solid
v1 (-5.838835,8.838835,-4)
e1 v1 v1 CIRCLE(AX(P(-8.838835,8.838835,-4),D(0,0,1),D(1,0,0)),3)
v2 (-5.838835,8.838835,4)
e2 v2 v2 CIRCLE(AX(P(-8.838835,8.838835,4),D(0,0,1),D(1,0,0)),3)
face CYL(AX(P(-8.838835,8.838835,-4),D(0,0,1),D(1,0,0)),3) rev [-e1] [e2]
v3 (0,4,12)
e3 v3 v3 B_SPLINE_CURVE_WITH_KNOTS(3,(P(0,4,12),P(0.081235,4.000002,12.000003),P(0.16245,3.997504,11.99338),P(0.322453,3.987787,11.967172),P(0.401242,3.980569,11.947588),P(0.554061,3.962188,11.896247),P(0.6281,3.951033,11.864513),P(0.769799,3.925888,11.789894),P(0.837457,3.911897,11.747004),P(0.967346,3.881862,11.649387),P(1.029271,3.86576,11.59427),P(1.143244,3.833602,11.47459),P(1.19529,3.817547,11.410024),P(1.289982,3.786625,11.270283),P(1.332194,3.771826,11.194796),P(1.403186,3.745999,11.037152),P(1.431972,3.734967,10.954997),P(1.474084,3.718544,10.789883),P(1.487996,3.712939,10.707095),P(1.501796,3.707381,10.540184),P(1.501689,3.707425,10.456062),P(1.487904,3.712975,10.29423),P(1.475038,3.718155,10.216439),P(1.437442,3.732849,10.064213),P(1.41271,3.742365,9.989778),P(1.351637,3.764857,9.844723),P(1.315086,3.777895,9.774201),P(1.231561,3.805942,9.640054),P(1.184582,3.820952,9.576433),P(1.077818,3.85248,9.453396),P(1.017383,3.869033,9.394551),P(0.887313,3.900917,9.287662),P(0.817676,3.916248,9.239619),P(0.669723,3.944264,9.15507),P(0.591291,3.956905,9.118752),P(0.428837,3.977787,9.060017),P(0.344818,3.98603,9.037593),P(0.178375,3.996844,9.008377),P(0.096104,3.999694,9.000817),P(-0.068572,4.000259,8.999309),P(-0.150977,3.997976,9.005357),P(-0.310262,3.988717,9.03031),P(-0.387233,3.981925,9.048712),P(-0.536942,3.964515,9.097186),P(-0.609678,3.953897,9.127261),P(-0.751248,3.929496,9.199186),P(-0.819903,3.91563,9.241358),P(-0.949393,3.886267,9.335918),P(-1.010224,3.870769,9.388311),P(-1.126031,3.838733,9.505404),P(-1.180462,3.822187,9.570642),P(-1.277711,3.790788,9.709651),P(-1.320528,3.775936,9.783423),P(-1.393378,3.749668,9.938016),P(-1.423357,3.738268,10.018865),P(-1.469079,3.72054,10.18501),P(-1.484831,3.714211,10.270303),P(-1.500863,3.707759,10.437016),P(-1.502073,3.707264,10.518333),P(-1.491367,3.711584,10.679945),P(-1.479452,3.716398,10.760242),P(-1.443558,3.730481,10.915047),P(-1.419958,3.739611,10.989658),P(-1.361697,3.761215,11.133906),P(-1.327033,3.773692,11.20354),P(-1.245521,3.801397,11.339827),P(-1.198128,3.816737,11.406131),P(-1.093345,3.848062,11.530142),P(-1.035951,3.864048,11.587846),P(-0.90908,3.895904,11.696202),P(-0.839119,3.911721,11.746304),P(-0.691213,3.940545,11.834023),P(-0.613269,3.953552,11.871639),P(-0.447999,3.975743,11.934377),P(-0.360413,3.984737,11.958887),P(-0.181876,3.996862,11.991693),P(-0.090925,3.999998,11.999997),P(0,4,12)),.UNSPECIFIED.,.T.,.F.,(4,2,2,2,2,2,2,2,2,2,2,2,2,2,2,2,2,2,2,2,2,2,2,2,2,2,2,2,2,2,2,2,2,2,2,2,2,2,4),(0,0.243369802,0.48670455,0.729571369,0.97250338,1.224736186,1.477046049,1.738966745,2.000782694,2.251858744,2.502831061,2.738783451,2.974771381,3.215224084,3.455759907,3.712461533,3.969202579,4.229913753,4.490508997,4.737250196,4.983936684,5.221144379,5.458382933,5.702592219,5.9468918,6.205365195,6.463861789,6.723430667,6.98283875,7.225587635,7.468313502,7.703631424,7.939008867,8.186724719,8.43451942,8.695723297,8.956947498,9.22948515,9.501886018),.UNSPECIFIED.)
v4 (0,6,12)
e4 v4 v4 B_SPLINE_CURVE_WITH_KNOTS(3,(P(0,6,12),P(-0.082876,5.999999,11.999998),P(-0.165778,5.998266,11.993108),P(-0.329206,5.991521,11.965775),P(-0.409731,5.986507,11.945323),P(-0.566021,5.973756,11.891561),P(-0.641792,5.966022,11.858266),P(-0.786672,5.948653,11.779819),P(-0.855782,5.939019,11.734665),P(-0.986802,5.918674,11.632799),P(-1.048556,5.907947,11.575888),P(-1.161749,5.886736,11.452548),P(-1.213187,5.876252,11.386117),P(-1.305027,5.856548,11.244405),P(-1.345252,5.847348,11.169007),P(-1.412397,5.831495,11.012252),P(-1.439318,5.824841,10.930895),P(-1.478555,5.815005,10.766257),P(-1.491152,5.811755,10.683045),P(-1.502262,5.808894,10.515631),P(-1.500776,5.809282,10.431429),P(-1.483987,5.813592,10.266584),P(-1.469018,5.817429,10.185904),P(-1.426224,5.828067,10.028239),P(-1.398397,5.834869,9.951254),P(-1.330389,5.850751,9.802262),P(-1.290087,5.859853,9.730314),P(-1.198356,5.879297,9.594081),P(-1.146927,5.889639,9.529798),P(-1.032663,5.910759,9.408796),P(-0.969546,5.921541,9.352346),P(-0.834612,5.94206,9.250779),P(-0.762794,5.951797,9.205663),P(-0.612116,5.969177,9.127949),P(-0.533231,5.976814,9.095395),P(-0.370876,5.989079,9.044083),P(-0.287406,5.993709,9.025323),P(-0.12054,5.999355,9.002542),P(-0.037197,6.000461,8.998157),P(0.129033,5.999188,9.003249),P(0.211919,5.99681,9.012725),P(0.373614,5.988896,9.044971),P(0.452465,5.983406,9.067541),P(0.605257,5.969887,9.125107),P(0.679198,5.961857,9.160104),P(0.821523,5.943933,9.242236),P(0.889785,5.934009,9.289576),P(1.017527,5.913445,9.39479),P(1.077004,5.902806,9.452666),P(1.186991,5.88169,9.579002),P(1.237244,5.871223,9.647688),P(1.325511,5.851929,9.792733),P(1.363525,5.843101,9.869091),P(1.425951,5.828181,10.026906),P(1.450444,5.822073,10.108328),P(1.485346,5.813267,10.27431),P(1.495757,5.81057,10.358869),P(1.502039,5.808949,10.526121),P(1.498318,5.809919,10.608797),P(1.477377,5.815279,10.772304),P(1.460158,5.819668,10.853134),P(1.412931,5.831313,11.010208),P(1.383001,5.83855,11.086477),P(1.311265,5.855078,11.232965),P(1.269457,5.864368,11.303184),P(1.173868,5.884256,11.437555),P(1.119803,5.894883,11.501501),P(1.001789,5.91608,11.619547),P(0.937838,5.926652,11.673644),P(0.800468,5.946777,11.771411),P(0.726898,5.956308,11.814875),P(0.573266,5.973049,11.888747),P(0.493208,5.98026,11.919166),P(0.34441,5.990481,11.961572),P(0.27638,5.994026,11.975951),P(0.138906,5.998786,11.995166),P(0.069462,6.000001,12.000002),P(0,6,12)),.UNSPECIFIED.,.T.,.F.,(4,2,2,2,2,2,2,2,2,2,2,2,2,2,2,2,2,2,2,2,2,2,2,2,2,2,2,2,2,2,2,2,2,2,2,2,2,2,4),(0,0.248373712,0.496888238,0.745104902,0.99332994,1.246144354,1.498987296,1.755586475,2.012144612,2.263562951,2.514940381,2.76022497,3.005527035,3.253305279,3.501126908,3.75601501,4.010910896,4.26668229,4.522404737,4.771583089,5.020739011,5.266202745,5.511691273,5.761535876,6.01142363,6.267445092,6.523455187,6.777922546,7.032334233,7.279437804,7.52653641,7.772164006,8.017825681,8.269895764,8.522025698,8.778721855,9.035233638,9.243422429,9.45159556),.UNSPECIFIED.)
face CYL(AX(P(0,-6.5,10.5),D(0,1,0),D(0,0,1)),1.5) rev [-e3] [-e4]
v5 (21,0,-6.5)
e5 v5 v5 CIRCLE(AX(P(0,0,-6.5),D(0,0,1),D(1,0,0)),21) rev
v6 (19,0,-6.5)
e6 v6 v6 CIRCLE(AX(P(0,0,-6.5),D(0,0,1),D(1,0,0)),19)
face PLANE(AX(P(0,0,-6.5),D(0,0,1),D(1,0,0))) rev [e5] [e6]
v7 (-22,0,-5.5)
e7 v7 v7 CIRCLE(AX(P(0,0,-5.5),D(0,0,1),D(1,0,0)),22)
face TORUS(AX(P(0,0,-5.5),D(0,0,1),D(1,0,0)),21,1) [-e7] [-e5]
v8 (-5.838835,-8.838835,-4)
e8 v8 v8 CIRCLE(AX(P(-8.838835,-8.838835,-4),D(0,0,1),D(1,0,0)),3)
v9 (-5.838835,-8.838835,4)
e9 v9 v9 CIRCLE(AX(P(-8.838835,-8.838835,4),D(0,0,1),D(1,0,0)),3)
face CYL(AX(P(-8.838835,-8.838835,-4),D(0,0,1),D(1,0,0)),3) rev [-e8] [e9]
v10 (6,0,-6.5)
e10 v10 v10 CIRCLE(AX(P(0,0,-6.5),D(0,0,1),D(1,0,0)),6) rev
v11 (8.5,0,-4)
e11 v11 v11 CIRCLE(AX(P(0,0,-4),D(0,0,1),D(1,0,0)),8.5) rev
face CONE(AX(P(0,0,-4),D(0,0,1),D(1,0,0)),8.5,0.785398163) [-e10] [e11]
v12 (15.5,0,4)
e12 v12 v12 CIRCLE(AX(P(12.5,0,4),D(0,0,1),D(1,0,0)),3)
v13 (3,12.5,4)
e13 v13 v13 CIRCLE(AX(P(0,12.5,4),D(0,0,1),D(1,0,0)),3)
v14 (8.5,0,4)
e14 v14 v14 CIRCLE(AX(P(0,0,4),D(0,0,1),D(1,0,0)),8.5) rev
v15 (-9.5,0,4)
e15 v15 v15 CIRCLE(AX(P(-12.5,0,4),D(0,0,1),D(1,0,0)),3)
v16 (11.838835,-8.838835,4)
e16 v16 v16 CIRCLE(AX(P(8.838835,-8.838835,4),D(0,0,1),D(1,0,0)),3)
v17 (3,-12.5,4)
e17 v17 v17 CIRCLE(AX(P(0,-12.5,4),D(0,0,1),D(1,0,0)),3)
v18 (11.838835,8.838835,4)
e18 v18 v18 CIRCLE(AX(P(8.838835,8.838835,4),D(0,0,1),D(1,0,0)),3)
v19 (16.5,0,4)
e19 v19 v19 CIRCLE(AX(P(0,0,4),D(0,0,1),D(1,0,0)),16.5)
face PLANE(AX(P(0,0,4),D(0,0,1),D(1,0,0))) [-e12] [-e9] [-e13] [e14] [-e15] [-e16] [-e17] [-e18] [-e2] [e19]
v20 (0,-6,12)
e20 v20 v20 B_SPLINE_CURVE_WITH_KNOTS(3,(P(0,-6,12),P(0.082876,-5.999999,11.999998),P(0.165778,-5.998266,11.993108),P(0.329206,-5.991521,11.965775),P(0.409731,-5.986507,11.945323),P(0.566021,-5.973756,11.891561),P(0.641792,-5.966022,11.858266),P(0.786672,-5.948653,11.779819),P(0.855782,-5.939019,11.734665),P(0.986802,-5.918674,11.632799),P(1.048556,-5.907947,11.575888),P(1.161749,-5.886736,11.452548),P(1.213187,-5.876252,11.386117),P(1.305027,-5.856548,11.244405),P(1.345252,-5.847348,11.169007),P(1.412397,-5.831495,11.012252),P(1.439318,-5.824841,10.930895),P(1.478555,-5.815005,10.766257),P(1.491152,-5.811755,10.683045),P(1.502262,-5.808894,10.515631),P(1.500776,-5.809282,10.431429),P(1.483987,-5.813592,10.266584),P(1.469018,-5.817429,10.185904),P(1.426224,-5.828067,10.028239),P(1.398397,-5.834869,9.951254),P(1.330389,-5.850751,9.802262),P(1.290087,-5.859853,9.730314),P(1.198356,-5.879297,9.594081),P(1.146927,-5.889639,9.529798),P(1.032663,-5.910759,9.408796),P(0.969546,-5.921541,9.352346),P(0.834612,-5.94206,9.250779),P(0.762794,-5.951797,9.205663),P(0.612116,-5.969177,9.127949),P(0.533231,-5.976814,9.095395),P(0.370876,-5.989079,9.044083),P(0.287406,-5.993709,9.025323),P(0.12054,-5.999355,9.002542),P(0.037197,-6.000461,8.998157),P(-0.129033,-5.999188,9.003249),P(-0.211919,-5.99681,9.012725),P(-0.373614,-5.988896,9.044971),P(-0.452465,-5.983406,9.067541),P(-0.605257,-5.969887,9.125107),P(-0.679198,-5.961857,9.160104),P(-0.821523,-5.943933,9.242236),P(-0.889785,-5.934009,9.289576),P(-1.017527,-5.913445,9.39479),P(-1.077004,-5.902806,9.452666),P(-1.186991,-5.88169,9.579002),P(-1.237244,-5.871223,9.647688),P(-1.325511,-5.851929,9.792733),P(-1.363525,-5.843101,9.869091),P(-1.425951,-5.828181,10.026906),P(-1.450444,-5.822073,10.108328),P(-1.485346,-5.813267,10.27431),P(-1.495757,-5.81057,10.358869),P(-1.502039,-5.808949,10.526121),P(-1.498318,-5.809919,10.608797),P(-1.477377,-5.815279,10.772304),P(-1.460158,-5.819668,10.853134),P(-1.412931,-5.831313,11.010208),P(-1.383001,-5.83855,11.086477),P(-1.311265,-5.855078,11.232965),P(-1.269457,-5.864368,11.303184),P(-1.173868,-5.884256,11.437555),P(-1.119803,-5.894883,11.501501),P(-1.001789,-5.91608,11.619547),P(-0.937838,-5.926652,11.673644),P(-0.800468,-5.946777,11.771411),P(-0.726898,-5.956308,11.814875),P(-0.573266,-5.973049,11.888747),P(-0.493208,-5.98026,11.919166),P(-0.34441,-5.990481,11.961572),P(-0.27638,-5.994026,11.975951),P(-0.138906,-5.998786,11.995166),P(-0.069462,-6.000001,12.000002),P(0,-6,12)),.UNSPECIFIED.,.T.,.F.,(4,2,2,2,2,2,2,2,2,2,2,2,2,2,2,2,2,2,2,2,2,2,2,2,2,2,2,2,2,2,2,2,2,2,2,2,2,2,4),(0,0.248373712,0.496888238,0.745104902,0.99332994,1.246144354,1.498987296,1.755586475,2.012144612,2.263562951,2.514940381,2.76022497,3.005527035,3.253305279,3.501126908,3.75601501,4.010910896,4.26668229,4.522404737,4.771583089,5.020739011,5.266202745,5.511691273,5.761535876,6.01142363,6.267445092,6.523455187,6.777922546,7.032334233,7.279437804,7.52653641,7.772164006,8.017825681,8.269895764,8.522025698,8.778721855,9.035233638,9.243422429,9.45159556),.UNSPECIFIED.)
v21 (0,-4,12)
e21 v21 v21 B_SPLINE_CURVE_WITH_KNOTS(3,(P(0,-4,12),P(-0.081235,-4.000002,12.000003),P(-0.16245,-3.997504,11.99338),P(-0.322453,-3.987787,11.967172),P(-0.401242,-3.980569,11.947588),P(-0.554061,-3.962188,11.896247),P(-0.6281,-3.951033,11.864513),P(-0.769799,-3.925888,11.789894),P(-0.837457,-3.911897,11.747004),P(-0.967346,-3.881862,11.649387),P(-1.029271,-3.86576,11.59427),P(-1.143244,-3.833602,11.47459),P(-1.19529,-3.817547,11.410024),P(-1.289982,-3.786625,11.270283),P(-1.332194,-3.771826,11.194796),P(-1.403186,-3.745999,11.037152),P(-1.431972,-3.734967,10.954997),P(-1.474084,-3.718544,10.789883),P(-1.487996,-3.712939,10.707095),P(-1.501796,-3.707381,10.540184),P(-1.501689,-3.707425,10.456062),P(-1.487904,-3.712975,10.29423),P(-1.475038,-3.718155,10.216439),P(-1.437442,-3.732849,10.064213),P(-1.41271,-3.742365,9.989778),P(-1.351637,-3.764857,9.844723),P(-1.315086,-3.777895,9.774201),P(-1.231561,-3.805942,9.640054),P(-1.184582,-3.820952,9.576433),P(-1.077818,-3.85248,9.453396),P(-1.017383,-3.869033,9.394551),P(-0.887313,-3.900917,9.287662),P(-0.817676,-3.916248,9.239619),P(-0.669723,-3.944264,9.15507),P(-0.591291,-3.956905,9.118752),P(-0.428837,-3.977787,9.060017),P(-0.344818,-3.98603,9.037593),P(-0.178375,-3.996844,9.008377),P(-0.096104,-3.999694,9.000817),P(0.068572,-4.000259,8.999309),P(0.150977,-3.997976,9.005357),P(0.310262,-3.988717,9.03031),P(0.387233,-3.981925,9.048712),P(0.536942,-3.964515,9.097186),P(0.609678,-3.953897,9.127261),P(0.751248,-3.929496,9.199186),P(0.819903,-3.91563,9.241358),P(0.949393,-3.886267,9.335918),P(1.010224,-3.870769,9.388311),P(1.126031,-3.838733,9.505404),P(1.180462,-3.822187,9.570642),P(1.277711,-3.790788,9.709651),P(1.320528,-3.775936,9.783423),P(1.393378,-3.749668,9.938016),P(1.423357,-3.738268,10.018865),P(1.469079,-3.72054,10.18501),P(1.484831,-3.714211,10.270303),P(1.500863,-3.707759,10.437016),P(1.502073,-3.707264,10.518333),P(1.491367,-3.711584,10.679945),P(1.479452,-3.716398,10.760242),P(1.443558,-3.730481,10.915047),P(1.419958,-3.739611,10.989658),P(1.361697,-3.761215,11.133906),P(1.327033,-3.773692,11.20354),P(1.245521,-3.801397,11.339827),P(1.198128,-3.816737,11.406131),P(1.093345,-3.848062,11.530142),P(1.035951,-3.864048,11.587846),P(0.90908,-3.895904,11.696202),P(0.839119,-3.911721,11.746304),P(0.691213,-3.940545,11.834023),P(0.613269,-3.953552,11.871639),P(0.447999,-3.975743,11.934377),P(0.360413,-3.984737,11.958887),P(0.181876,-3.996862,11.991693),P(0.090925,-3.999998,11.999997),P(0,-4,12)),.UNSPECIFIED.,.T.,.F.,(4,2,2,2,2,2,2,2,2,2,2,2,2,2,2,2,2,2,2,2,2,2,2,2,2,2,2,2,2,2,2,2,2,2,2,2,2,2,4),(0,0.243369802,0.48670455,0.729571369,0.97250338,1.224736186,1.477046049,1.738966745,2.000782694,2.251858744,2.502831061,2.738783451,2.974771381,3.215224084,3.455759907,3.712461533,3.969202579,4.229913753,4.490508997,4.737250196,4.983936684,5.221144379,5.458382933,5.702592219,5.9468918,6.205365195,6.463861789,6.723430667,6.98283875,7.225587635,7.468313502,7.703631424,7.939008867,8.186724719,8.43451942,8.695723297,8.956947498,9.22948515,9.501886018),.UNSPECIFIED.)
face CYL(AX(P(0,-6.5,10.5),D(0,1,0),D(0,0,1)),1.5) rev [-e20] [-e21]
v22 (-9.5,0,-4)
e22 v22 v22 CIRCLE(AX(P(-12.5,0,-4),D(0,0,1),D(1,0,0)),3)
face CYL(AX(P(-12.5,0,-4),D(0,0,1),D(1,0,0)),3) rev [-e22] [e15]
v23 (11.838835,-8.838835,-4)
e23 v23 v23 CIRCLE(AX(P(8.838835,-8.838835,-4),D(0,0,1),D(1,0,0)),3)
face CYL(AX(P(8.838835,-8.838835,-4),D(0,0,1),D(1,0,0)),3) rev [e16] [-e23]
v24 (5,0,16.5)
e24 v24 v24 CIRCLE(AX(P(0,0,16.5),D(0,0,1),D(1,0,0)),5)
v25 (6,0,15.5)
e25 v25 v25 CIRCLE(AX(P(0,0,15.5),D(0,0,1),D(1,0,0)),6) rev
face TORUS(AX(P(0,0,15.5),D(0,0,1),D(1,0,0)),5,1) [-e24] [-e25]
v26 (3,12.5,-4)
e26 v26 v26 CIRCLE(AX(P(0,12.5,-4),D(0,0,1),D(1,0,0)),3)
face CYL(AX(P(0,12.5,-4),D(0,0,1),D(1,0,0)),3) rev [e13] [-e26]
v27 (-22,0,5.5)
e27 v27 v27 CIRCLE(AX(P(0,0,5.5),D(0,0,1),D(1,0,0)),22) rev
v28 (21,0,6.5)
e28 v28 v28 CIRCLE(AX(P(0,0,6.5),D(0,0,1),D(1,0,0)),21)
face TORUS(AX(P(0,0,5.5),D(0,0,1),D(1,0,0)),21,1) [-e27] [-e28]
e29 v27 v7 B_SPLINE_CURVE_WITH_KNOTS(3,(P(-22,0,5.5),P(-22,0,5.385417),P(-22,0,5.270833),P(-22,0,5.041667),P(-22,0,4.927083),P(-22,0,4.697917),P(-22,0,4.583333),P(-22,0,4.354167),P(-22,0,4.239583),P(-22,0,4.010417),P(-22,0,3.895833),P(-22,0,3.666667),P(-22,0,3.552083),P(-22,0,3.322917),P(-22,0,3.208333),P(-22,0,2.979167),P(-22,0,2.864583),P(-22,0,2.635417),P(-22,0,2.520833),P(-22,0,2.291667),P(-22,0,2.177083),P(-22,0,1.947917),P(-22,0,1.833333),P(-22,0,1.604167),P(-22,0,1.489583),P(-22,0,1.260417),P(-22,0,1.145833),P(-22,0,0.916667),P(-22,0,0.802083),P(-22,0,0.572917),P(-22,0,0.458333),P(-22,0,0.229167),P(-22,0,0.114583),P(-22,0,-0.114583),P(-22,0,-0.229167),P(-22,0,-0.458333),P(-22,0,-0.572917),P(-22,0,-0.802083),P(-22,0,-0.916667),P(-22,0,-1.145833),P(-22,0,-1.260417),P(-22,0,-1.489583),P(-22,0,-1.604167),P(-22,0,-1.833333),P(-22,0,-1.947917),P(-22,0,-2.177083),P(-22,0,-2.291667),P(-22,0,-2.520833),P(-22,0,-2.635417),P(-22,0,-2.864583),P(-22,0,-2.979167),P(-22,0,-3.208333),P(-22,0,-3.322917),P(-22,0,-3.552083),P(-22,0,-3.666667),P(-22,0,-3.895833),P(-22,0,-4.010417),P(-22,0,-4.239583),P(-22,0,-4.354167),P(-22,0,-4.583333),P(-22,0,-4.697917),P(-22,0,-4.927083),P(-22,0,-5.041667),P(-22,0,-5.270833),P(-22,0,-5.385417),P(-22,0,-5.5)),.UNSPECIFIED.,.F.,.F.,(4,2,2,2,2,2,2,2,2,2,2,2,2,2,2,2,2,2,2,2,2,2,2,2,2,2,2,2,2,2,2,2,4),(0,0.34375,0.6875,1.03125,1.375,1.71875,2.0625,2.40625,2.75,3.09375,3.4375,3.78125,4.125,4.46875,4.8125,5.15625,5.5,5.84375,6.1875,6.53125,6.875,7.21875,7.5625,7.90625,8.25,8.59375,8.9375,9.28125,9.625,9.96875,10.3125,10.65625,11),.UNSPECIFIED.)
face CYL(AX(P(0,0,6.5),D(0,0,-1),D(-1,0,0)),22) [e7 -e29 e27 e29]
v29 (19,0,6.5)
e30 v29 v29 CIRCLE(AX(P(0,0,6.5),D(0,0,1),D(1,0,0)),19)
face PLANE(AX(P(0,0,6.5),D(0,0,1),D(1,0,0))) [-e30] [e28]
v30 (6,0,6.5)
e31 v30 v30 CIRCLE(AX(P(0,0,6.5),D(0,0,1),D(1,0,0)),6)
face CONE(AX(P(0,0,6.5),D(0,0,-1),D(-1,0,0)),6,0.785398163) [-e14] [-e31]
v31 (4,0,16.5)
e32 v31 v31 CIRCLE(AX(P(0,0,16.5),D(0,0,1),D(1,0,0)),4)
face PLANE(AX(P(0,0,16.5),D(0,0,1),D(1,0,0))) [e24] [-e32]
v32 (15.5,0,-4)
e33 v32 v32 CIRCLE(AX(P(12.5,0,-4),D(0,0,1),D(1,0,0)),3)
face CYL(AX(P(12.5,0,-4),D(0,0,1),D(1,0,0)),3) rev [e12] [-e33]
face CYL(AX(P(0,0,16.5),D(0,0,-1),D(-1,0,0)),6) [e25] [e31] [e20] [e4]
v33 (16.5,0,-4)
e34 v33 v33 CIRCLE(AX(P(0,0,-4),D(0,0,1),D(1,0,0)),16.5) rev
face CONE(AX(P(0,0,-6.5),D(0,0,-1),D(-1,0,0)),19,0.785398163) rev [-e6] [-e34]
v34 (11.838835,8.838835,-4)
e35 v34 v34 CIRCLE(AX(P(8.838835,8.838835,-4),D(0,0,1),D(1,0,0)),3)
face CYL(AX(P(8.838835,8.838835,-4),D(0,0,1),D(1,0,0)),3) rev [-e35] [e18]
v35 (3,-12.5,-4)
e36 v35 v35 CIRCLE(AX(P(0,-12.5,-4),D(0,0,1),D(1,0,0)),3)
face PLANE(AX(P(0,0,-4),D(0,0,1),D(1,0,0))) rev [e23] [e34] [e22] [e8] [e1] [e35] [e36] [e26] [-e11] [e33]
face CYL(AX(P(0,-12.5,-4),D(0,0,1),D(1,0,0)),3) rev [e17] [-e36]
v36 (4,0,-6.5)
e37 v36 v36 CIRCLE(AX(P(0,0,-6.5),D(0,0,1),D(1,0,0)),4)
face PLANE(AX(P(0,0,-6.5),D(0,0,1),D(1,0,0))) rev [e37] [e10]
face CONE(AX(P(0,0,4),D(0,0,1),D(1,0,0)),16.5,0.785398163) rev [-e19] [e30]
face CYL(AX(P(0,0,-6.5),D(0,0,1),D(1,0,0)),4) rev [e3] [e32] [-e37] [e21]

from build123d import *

# Parameters (mm, degrees)
SKETCH1_R           = 22
SKETCH1_R_2         = 19
BOSS_EXTRUDE1_DEPTH = 6.5
SKETCH2_R           = 19
BOSS_EXTRUDE2_DEPTH = 4
CHAMFER1_SIZE       = 2.5
SKETCH3_R           = 3
CUT_EXTRUDE1_DEPTH  = 4
SKETCH5_R           = 8.5
BOSS_EXTRUDE3_DEPTH = 6.5
CHAMFER3_SIZE       = 2.5
SKETCH6_R           = 6
BOSS_EXTRUDE4_DEPTH = 10
FILLET2_R           = 1
SKETCH7_R           = 4
CUT_EXTRUDE2_DEPTH  = 23
SKETCH8_R           = 1.5
CUT_EXTRUDE3_DEPTH  = 6.5
FILLET3_R           = 1


with BuildPart() as part:
    # Sketch1 → Boss-Extrude1 (new, symmetric)
    with BuildSketch(Plane.XY):
        with Locations(Location((0, 0, 0), (0, 0, 180))):
            Circle(SKETCH1_R)
        with Locations(Location((0, 0, 0), (0, 0, 180))):
            Circle(SKETCH1_R_2, mode=Mode.SUBTRACT)
    extrude(amount=BOSS_EXTRUDE1_DEPTH, both=True)

    # Sketch2 → Boss-Extrude2 (add, symmetric)
    with BuildSketch(Plane.XY):
        with Locations(Location((0, 0, 0), (0, 0, 180))):
            Circle(SKETCH2_R)
    extrude(amount=BOSS_EXTRUDE2_DEPTH, both=True)

    # Chamfer1
    chamfer1_edges = [part.edges().sort_by_distance(p)[0] for p in [
        (19, 0, -4),
        (19, 0, 4),
    ]]
    chamfer(chamfer1_edges, length=CHAMFER1_SIZE - 0.0001)  # a hair under: the kernel refuses the full size

    # Sketch3 → Cut-Extrude1 (cut, symmetric)
    with BuildSketch(Plane.XY):
        with Locations((0, 12.5)):
            Circle(SKETCH3_R)
        with Locations((8.838834765, 8.838834765)):
            Circle(SKETCH3_R)
        with Locations((12.5, 0)):
            Circle(SKETCH3_R)
        with Locations((8.838834765, -8.838834765)):
            Circle(SKETCH3_R)
        with Locations((0, -12.5)):
            Circle(SKETCH3_R)
        with Locations((-8.838834765, -8.838834765)):
            Circle(SKETCH3_R)
        with Locations((-12.5, 0)):
            Circle(SKETCH3_R)
        with Locations((-8.838834765, 8.838834765)):
            Circle(SKETCH3_R)
    extrude(amount=CUT_EXTRUDE1_DEPTH, both=True, mode=Mode.SUBTRACT)

    # Sketch5 → Boss-Extrude3 (add, symmetric)
    with BuildSketch(Plane.XY):
        with Locations(Location((0, 0, 0), (0, 0, 180))):
            Circle(SKETCH5_R)
    extrude(amount=BOSS_EXTRUDE3_DEPTH, both=True)

    # Chamfer3
    chamfer3_edges = [part.edges().sort_by_distance(p)[0] for p in [
        (8.5, 0, -6.5),
        (8.5, 0, 6.5),
    ]]
    chamfer(chamfer3_edges, length=CHAMFER3_SIZE - 0.0001)  # a hair under: the kernel refuses the full size

    # Sketch6 → Boss-Extrude4 (add)
    with BuildSketch(Plane.XY.offset(6.5)):
        Circle(SKETCH6_R)
    extrude(amount=BOSS_EXTRUDE4_DEPTH)

    # Fillet2
    fillet2_edges = [part.edges().sort_by_distance(p)[0] for p in [
        (-6, 0, 16.5),
    ]]
    fillet(fillet2_edges, radius=FILLET2_R)

    # Sketch7 → Cut-Extrude2 (cut)
    with BuildSketch(Plane.XY.offset(16.5)):
        Circle(SKETCH7_R)
    extrude(amount=-CUT_EXTRUDE2_DEPTH, mode=Mode.SUBTRACT)

    # Sketch8 → Cut-Extrude3 (cut, symmetric)
    with BuildSketch(Plane(origin=(0, 0, 0), x_dir=(1, 0, 0), z_dir=(0, 1, 0))):
        with Locations(Location((0, -10.5, 0), (0, 0, 270))):
            Circle(SKETCH8_R)
    extrude(amount=CUT_EXTRUDE3_DEPTH, both=True, mode=Mode.SUBTRACT)

    # Fillet3
    fillet3_edges = [part.edges().sort_by_distance(p)[0] for p in [
        (22, 0, -6.5),
        (22, 0, 6.5),
    ]]
    fillet(fillet3_edges, radius=FILLET3_R)


solid = part.part
